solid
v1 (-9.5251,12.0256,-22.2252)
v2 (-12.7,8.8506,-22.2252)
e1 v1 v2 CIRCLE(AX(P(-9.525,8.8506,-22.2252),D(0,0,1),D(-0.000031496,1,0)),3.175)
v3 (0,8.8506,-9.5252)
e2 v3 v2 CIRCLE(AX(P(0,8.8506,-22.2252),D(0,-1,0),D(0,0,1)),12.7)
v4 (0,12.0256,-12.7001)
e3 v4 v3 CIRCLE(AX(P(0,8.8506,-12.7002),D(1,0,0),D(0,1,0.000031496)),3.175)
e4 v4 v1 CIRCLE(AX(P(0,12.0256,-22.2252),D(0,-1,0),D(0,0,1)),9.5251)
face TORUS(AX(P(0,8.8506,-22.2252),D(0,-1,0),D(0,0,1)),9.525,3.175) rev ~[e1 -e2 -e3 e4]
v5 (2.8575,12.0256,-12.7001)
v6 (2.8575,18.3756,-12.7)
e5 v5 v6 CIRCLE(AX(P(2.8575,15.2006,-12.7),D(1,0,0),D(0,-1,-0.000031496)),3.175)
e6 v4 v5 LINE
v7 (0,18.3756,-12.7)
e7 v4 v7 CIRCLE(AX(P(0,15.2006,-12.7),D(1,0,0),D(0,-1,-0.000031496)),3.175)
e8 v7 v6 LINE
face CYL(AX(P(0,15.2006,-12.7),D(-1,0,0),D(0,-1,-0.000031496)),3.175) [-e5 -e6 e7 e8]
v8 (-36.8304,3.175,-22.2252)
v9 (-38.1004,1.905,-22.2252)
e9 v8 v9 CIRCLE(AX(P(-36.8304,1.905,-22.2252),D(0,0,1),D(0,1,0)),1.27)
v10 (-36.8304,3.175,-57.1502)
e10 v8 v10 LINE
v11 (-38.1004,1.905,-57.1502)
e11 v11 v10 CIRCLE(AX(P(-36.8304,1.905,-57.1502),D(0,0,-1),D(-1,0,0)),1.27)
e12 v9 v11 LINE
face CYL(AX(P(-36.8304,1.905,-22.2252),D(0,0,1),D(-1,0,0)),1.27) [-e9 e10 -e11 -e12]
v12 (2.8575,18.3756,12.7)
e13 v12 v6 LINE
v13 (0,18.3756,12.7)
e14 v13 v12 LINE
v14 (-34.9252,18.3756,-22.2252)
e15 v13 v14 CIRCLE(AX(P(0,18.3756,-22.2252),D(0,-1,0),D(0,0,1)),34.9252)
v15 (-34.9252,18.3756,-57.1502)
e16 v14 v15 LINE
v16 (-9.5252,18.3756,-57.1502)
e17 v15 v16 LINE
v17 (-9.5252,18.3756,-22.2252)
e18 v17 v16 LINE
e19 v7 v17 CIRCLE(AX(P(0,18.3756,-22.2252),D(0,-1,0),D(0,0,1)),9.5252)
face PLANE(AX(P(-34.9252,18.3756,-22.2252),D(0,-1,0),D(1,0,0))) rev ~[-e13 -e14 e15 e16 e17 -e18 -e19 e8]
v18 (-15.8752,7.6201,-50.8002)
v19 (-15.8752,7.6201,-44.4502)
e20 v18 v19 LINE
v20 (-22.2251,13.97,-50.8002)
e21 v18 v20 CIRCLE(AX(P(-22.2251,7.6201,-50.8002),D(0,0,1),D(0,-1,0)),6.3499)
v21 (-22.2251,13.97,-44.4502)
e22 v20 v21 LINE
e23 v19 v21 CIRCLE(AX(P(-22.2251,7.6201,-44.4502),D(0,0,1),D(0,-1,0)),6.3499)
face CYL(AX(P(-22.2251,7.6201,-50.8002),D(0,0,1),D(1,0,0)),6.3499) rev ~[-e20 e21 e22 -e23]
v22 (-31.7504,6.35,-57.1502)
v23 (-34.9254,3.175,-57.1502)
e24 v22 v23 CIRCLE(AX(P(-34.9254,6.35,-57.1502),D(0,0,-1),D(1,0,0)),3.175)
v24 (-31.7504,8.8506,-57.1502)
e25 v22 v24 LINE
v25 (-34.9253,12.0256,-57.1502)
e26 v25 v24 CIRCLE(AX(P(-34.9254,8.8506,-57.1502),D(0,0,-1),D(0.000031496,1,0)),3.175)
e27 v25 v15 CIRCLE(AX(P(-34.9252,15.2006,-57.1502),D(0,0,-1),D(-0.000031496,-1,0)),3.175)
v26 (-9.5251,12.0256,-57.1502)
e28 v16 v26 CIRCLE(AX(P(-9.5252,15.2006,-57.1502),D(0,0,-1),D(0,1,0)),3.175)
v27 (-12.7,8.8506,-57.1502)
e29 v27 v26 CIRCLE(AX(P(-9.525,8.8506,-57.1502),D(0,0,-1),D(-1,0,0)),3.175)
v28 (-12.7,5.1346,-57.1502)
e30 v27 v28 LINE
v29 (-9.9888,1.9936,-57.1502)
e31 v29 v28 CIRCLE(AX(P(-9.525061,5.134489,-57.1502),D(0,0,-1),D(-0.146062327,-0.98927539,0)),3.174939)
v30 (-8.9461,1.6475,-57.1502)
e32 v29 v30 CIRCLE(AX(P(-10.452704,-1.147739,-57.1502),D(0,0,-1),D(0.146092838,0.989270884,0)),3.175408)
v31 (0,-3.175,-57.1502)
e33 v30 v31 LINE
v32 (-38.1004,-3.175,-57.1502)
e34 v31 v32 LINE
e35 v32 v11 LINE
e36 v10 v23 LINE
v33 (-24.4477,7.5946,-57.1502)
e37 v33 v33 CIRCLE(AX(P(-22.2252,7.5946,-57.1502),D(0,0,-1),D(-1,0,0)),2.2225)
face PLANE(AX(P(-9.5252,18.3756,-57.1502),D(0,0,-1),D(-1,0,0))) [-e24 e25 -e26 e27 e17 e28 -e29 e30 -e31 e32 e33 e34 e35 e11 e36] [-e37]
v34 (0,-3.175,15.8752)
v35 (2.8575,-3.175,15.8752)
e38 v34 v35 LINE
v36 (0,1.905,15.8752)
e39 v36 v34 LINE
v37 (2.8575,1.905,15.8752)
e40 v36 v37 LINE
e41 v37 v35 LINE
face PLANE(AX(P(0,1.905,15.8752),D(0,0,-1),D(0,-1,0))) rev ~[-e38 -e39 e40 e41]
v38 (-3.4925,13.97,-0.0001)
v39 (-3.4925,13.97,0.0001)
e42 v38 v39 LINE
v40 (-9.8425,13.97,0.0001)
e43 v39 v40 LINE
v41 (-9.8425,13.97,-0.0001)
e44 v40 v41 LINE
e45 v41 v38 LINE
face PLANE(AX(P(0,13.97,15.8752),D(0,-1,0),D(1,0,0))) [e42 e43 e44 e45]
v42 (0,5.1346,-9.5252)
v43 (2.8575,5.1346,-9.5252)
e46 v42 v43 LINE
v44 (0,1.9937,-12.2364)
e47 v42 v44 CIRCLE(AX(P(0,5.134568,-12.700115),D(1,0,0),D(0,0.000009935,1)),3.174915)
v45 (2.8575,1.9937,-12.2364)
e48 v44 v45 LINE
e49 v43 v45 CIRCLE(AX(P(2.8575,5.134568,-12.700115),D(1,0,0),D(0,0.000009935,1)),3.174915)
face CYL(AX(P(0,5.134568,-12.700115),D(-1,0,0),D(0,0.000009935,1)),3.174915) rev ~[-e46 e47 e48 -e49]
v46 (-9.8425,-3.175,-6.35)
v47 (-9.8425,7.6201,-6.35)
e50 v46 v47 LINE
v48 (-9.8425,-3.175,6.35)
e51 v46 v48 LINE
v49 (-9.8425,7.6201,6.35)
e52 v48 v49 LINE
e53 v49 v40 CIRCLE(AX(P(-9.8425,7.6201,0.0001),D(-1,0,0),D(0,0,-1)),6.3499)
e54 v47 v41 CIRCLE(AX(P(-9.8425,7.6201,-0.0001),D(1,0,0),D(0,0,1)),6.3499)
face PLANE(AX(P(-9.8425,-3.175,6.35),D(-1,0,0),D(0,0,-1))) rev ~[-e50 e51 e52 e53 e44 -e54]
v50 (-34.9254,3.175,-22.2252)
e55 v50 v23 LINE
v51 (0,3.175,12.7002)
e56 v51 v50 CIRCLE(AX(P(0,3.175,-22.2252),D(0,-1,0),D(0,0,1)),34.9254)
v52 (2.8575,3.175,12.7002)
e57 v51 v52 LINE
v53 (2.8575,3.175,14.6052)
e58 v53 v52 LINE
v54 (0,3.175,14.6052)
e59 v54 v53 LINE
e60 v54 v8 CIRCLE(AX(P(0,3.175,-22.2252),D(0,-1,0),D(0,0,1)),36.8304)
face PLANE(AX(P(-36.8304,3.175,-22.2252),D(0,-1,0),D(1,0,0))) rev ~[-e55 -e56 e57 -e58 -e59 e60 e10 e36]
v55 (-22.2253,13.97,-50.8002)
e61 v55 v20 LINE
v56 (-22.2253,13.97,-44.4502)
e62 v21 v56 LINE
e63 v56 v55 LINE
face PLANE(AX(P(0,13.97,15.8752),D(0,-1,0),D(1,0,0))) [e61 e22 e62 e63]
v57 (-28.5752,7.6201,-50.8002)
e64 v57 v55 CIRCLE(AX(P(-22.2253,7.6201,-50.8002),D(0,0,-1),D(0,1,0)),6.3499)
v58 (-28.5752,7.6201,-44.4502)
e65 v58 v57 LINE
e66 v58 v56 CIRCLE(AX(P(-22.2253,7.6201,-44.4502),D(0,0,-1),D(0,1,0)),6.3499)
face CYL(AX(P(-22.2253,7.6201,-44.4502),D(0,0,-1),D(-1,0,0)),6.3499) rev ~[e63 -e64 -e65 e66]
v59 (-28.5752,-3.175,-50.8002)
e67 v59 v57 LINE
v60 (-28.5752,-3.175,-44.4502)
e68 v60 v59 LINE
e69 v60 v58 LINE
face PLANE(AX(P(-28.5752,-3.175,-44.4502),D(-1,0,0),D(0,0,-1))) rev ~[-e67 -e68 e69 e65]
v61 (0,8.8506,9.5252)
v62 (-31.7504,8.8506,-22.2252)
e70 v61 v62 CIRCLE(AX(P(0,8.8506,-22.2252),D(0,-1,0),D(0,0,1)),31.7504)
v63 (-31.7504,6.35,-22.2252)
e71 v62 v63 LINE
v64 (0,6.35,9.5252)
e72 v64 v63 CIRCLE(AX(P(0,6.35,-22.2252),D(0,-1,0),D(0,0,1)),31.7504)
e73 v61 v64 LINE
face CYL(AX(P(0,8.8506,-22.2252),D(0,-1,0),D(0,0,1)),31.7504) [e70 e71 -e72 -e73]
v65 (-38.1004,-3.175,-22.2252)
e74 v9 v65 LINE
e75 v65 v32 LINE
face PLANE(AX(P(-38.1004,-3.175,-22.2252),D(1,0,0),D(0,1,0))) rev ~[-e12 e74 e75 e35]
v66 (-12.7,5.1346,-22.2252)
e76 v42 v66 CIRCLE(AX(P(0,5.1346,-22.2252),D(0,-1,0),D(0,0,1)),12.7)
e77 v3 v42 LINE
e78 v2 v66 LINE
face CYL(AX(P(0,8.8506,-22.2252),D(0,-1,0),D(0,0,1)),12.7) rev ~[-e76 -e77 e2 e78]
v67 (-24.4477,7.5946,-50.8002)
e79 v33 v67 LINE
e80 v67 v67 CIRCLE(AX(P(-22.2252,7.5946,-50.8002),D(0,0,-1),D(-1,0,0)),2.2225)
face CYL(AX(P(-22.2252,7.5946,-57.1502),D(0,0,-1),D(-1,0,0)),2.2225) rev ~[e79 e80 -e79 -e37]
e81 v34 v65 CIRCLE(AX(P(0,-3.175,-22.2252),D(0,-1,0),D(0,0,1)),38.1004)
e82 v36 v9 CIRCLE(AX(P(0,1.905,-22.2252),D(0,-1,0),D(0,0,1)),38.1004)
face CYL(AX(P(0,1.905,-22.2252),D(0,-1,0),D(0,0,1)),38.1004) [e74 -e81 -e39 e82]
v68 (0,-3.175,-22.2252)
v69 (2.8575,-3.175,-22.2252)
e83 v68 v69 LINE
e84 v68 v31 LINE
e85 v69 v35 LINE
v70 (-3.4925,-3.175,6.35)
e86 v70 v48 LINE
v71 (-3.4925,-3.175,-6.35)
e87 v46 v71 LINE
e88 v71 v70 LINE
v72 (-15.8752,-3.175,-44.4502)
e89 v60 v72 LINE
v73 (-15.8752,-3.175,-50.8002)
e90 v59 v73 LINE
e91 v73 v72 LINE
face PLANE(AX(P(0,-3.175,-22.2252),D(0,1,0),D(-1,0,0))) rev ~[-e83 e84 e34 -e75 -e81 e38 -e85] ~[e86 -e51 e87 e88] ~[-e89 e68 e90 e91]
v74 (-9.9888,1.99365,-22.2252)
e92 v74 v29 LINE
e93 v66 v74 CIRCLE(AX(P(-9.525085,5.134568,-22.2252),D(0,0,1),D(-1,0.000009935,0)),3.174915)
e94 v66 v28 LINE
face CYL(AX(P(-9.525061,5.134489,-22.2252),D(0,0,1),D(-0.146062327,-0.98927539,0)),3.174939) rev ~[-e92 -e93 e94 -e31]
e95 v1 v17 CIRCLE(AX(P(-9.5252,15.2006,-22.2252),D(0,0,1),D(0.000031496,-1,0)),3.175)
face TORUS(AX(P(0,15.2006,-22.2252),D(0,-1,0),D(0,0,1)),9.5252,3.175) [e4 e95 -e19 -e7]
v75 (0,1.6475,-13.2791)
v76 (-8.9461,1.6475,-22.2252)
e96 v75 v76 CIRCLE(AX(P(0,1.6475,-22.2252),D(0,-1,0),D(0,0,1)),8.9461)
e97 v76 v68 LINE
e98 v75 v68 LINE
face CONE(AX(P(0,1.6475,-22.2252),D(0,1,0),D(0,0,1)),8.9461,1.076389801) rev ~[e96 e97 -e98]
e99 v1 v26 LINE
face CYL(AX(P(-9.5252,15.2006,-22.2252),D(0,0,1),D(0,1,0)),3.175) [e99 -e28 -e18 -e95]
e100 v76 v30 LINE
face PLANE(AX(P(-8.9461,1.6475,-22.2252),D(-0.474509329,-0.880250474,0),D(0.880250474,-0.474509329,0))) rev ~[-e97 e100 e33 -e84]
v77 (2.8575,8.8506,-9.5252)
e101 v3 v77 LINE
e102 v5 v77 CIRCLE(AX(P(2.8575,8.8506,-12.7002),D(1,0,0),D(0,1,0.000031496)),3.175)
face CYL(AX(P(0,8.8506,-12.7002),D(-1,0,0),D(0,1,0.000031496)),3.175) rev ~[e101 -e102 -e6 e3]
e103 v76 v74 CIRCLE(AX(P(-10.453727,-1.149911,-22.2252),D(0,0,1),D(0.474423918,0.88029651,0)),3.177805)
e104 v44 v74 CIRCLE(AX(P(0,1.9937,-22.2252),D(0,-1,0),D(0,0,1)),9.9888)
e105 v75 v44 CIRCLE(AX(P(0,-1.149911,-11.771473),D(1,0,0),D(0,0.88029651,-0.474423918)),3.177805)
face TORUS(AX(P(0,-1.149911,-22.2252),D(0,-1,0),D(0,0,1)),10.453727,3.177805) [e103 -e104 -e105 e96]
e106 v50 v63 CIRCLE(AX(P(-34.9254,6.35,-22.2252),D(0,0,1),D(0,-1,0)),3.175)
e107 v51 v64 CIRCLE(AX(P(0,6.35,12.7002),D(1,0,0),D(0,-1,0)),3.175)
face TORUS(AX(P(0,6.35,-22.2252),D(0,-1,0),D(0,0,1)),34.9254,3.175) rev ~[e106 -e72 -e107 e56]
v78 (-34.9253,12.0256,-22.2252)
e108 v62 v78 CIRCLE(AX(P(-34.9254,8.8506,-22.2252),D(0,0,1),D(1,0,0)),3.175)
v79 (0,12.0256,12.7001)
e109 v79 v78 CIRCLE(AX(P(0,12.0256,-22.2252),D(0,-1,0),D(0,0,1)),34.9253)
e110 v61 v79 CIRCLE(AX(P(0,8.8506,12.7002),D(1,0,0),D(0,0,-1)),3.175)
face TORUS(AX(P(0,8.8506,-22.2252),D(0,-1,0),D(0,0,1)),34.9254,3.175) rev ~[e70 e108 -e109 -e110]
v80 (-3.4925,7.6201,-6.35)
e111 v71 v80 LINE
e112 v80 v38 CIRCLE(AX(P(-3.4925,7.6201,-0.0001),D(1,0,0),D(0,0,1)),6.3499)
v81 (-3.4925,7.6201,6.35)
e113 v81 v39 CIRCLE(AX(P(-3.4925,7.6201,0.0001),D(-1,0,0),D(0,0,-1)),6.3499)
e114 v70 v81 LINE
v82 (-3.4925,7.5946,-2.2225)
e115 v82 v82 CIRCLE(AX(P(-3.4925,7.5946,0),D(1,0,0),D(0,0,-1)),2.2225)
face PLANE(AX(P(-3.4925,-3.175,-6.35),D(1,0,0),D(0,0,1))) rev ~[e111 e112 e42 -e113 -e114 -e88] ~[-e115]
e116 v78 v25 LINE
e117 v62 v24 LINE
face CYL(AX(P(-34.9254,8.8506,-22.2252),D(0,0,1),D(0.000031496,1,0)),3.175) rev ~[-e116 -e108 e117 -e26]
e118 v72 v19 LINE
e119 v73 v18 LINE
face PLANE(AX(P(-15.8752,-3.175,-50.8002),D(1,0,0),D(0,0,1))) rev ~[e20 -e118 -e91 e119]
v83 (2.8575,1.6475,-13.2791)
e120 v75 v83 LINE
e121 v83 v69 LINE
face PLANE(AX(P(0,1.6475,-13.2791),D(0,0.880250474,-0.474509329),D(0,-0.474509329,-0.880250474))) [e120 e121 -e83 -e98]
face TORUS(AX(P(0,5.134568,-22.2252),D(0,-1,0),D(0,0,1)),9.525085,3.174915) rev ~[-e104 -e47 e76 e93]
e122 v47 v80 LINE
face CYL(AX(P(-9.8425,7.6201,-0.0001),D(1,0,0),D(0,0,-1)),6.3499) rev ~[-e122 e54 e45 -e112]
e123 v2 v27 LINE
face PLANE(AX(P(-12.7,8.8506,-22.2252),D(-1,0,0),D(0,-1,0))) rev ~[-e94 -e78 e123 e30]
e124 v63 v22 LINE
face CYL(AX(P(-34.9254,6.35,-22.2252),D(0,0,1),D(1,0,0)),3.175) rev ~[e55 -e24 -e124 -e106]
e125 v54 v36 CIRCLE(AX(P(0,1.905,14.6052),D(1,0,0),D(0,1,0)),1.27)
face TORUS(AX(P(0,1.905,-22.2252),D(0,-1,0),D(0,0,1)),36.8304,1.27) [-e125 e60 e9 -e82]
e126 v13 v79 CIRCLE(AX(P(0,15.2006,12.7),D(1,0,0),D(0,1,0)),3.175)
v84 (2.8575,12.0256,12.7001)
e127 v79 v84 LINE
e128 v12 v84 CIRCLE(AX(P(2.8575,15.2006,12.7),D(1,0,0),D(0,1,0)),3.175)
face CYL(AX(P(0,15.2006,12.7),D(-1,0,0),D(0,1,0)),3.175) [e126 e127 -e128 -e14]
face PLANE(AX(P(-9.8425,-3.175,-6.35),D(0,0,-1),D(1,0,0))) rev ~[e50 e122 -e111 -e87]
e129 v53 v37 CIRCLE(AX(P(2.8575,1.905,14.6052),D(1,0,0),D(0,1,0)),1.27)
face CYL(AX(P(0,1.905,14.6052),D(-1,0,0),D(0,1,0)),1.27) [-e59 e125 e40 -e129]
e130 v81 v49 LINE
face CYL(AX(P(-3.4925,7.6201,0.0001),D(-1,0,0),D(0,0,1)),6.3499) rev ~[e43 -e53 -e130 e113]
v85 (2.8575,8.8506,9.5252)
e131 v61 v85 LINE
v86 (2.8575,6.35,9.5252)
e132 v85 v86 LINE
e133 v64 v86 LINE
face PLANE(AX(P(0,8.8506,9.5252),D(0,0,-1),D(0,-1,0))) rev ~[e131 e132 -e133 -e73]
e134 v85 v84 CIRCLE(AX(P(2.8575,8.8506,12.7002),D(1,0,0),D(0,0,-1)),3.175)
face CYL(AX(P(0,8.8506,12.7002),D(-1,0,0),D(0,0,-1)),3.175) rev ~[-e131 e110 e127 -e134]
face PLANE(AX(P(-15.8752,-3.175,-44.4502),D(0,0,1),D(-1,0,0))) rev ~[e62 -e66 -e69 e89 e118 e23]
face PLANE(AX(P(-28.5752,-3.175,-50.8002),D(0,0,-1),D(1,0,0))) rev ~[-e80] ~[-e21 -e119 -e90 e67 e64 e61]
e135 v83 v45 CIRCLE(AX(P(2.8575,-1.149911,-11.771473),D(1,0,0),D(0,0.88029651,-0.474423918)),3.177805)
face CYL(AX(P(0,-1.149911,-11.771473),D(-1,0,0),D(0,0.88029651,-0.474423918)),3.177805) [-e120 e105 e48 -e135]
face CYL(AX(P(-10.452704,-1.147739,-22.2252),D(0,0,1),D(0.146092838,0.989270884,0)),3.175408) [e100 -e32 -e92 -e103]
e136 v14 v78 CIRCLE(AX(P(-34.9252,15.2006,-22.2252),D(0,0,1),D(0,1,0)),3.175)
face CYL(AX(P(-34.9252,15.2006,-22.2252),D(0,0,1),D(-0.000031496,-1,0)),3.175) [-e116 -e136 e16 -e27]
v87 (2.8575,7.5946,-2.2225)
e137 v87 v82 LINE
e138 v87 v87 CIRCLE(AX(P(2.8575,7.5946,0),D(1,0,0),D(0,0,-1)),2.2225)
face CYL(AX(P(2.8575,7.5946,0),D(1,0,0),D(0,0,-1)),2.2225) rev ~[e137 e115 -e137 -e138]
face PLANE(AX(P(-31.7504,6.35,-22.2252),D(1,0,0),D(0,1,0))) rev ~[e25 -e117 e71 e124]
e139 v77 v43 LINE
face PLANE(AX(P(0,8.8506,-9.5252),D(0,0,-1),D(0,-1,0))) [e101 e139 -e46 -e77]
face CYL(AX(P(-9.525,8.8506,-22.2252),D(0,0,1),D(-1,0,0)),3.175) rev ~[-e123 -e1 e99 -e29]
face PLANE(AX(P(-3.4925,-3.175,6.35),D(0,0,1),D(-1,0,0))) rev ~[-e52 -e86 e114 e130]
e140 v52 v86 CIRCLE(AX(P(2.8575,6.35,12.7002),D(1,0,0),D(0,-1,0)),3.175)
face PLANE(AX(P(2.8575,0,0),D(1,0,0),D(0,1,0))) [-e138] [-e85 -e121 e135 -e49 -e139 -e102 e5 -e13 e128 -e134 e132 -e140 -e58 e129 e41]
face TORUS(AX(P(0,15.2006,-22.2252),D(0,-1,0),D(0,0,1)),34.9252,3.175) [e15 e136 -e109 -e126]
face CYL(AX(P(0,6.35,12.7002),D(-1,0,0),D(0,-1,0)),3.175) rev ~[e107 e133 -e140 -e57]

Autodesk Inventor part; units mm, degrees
ref_plane "YZ Plane" through (0, 0, 0) normal (1, 0, 0) x (0, 1, 0)
ref_plane "XZ Plane" through (0, 0, 0) normal (0, 1, 0) x (-1, 0, 0)
ref_plane "XY Plane" through (0, 0, 0) normal (0, 0, 1) x (1, 0, 0)
sketch "Sketch1" plane through (0, 0, 0) normal (1, 0, 0) x (0, 1, 0)
  line L0 (-3.175, -15.8752) -> (-3.175, 15.8752)
  line L1 (-3.175, 15.8752) -> (1.9596, -9.7981) construction
  line L2 (3.175, 15.8752) -> (-3.175, -15.8752) construction
  arc A0 (18.3756, 12.7) -> (12.0256, 12.7001) centre (15.2006, 12.7) ccw
  arc A1 (12.0256, -12.7001) -> (18.3756, -12.7) centre (15.2006, -12.7) ccw
  line L3 (8.8506, 9.5252) -> (6.35, 9.5252)
  line L4 (8.8506, -9.5252) -> (5.1346, -9.5252)
  line L5 (15.2006, 12.7) -> (15.2006, -12.7) construction
  line L6 (3.175, 14.6052) -> (3.175, 12.7002)
  arc A2 (8.8506, 9.5252) -> (12.0256, 12.7001) centre (8.8506, 12.7002) ccw
  arc A3 (12.0256, -12.7001) -> (8.8506, -9.5252) centre (8.8506, -12.7002) ccw
  arc A4 (3.175, 12.7002) -> (6.35, 9.5252) centre (6.35, 12.7002) ccw
  arc A5 (5.1346, -9.5252) -> (1.9937, -12.2364) centre (5.1346, -12.7002) ccw
  line L7 (-3.175, -15.8752) -> (-3.175, -22.2252)
  line L8 (1.905, 15.8752) -> (-3.175, 15.8752)
  arc A6 (3.175, 14.6052) -> (1.905, 15.8752) centre (1.905, 14.6052) ccw
  line L9 (18.3756, 12.7) -> (18.3756, -12.7)
  line L10 (1.6475, -13.2791) -> (-3.175, -22.2252)
  arc A7 (1.6475, -13.2791) -> (1.9937, -12.2364) centre (-1.1473, -11.7726) ccw
  line L11 (-3.175, -22.2252) -> (20.4919, -22.2252)
  point P0 (0, 0)
  point P1 (15.2367, 9.5252)
  point P2 (15.2367, -9.5252)
  point P3 (1.9596, -12.7002)
  dimension "d5" = 6.35
  dimension "d8" = 3.175
  dimension "d9" = 6.35
  dimension "d11" = 6.35
  dimension "d12" = 6.35
  dimension "d13" = 1.27
  dimension "d30" = 25.4
  dimension "d31" = 3.175
revolve "Revolution1" add sketch "Sketch1" angle 90 about axis through (0, -3.175, -22.2252) along (0, -1, 0)
extrude "Extrusion2" add sketch "Sketch1" along normal blind 2.8575
sketch "Sketch2" plane through (-9.5252, 18.3756, -22.2252) normal (0, 0, -1) x (-1, 0, 0)
  line L0 (-9.5252, -21.5506) -> (28.5752, -21.5506) projected
  line L1 (28.5752, -21.5506) -> (28.5752, -16.4706) projected
  arc A0 (28.5752, -16.4706) -> (27.3052, -15.2006) centre (27.3052, -16.4706) ccw projected
  line L2 (27.3052, -15.2006) -> (25.4002, -15.2006) projected
  arc A1 (22.2252, -12.0256) -> (25.4002, -15.2006) centre (25.4002, -12.0256) ccw projected
  line L3 (22.2252, -12.0256) -> (22.2252, -9.525) projected
  arc A2 (25.4001, -6.35) -> (22.2252, -9.525) centre (25.4002, -9.525) ccw projected
  arc A3 (25.4001, -6.35) -> (25.4, 0) centre (25.4, -3.175) ccw projected
  line L4 (25.4, 0) -> (0, 0) projected
  arc A4 (0, 0) -> (-0.0001, -6.35) centre (0, -3.175) ccw projected
  arc A5 (3.1748, -9.525) -> (-0.0001, -6.35) centre (-0.0002, -9.525) ccw projected
  line L5 (3.1748, -9.525) -> (3.1748, -13.241) projected
  arc A6 (0.4636, -16.382) -> (3.1748, -13.241) centre (-0.0002, -13.241) ccw projected
  arc A7 (0.4636, -16.382) -> (-0.5791, -16.7281) centre (0.9274, -19.5229) ccw projected
  line L6 (-0.5791, -16.7281) -> (-9.5252, -21.5506) projected
  point P0 (-9.5252, -18.3756)
extrude "Extrusion3" add sketch "Sketch2" along normal blind 34.925
sketch "Sketch5" plane through (2.8575, 0, 0) normal (1, 0, 0) x (0, 0, -1)
  circle A0 centre (0, 7.5946) radius 2.2225
  line L0 (-15.8752, -3.175) -> (22.2252, -3.175) projected
  point P0 (0, 0)
  dimension "d26" = 4.445
  dimension "d27" = 10.7696
extrude "Extrusion4" cut sketch "Sketch5" against normal blind 12.7
sketch "Sketch6" plane through (-9.5252, 18.3756, -57.1502) normal (0, 0, -1) x (-1, 0, 0)
  line L0 (3.1748, -9.525) -> (3.1748, -13.241) projected
  line L1 (3.1748, -10.781) -> (22.2252, -10.781) construction
  line L2 (22.2252, -12.0256) -> (22.2252, -9.525) projected
  circle A0 centre (12.7, -10.781) radius 2.2225
  line L3 (-9.5252, -21.5506) -> (28.5752, -21.5506) projected
  point P0 (-9.5252, -18.3756)
  dimension "d32" = 4.445
  dimension "d33" = 10.7696
extrude "Extrusion5" cut sketch "Sketch6" against normal blind 12.7
sketch "Sketch7" plane through (0, -3.175, 15.8752) normal (0, -1, 0) x (1, 0, 0)
  line L0 (-9.8425, -13.6527) -> (-9.8425, -18.0977) projected
  line L1 (2.8575, -13.6527) -> (2.8575, -18.0977) projected
  line L2 (-20.0027, -60.3254) -> (-24.4477, -60.3254) projected
  line L3 (-20.0027, -73.0254) -> (-24.4477, -73.0254) projected
  line L4 (2.8575, 0) -> (2.8575, -38.1004) projected
  line L5 (2.8575, -15.8752) -> (-3.4925, -15.8752) construction
  line L6 (-9.8425, -22.2252) -> (-3.4925, -22.2252)
  line L7 (-3.4925, -22.2252) -> (-3.4925, -9.5252)
  line L8 (-3.4925, -9.5252) -> (-9.8425, -9.5252)
  line L9 (-9.8425, -9.5252) -> (-9.8425, -22.2252)
  line L10 (-9.8425, -22.2252) -> (-3.4925, -9.5252) construction
  line L11 (-3.4925, -22.2252) -> (-9.8425, -9.5252) construction
  line L12 (0, -73.0254) -> (-38.1004, -73.0254) projected
  line L13 (-22.2252, -73.0254) -> (-22.2252, -66.6754) construction
  line L14 (-15.8752, -60.3254) -> (-28.5752, -60.3254)
  line L15 (-28.5752, -60.3254) -> (-28.5752, -66.6754)
  line L16 (-28.5752, -66.6754) -> (-15.8752, -66.6754)
  line L17 (-15.8752, -66.6754) -> (-15.8752, -60.3254)
  line L18 (-15.8752, -60.3254) -> (-28.5752, -66.6754) construction
  line L19 (-28.5752, -60.3254) -> (-15.8752, -66.6754) construction
  point P0 (0, -15.8752)
  point P1 (-6.6675, -15.8752)
  point P2 (-22.2252, -63.5004)
  dimension "d41" = 6.35
  dimension "d42" = 6.35
  dimension "d43" = 12.7
  dimension "d44" = 6.35
extrude "Extrusion6" cut sketch "Sketch7" against normal blind 17.145
fillet "Fillet1" radius 6.35 4 edges at (-6.6675, 13.97, 6.35) (-6.6675, 13.97, -6.35) (-28.5752, 13.97, -47.6252) (-15.8752, 13.97, -47.6252)
properties part number "Rail Corner 2" material "Acetal Resin, Black"
